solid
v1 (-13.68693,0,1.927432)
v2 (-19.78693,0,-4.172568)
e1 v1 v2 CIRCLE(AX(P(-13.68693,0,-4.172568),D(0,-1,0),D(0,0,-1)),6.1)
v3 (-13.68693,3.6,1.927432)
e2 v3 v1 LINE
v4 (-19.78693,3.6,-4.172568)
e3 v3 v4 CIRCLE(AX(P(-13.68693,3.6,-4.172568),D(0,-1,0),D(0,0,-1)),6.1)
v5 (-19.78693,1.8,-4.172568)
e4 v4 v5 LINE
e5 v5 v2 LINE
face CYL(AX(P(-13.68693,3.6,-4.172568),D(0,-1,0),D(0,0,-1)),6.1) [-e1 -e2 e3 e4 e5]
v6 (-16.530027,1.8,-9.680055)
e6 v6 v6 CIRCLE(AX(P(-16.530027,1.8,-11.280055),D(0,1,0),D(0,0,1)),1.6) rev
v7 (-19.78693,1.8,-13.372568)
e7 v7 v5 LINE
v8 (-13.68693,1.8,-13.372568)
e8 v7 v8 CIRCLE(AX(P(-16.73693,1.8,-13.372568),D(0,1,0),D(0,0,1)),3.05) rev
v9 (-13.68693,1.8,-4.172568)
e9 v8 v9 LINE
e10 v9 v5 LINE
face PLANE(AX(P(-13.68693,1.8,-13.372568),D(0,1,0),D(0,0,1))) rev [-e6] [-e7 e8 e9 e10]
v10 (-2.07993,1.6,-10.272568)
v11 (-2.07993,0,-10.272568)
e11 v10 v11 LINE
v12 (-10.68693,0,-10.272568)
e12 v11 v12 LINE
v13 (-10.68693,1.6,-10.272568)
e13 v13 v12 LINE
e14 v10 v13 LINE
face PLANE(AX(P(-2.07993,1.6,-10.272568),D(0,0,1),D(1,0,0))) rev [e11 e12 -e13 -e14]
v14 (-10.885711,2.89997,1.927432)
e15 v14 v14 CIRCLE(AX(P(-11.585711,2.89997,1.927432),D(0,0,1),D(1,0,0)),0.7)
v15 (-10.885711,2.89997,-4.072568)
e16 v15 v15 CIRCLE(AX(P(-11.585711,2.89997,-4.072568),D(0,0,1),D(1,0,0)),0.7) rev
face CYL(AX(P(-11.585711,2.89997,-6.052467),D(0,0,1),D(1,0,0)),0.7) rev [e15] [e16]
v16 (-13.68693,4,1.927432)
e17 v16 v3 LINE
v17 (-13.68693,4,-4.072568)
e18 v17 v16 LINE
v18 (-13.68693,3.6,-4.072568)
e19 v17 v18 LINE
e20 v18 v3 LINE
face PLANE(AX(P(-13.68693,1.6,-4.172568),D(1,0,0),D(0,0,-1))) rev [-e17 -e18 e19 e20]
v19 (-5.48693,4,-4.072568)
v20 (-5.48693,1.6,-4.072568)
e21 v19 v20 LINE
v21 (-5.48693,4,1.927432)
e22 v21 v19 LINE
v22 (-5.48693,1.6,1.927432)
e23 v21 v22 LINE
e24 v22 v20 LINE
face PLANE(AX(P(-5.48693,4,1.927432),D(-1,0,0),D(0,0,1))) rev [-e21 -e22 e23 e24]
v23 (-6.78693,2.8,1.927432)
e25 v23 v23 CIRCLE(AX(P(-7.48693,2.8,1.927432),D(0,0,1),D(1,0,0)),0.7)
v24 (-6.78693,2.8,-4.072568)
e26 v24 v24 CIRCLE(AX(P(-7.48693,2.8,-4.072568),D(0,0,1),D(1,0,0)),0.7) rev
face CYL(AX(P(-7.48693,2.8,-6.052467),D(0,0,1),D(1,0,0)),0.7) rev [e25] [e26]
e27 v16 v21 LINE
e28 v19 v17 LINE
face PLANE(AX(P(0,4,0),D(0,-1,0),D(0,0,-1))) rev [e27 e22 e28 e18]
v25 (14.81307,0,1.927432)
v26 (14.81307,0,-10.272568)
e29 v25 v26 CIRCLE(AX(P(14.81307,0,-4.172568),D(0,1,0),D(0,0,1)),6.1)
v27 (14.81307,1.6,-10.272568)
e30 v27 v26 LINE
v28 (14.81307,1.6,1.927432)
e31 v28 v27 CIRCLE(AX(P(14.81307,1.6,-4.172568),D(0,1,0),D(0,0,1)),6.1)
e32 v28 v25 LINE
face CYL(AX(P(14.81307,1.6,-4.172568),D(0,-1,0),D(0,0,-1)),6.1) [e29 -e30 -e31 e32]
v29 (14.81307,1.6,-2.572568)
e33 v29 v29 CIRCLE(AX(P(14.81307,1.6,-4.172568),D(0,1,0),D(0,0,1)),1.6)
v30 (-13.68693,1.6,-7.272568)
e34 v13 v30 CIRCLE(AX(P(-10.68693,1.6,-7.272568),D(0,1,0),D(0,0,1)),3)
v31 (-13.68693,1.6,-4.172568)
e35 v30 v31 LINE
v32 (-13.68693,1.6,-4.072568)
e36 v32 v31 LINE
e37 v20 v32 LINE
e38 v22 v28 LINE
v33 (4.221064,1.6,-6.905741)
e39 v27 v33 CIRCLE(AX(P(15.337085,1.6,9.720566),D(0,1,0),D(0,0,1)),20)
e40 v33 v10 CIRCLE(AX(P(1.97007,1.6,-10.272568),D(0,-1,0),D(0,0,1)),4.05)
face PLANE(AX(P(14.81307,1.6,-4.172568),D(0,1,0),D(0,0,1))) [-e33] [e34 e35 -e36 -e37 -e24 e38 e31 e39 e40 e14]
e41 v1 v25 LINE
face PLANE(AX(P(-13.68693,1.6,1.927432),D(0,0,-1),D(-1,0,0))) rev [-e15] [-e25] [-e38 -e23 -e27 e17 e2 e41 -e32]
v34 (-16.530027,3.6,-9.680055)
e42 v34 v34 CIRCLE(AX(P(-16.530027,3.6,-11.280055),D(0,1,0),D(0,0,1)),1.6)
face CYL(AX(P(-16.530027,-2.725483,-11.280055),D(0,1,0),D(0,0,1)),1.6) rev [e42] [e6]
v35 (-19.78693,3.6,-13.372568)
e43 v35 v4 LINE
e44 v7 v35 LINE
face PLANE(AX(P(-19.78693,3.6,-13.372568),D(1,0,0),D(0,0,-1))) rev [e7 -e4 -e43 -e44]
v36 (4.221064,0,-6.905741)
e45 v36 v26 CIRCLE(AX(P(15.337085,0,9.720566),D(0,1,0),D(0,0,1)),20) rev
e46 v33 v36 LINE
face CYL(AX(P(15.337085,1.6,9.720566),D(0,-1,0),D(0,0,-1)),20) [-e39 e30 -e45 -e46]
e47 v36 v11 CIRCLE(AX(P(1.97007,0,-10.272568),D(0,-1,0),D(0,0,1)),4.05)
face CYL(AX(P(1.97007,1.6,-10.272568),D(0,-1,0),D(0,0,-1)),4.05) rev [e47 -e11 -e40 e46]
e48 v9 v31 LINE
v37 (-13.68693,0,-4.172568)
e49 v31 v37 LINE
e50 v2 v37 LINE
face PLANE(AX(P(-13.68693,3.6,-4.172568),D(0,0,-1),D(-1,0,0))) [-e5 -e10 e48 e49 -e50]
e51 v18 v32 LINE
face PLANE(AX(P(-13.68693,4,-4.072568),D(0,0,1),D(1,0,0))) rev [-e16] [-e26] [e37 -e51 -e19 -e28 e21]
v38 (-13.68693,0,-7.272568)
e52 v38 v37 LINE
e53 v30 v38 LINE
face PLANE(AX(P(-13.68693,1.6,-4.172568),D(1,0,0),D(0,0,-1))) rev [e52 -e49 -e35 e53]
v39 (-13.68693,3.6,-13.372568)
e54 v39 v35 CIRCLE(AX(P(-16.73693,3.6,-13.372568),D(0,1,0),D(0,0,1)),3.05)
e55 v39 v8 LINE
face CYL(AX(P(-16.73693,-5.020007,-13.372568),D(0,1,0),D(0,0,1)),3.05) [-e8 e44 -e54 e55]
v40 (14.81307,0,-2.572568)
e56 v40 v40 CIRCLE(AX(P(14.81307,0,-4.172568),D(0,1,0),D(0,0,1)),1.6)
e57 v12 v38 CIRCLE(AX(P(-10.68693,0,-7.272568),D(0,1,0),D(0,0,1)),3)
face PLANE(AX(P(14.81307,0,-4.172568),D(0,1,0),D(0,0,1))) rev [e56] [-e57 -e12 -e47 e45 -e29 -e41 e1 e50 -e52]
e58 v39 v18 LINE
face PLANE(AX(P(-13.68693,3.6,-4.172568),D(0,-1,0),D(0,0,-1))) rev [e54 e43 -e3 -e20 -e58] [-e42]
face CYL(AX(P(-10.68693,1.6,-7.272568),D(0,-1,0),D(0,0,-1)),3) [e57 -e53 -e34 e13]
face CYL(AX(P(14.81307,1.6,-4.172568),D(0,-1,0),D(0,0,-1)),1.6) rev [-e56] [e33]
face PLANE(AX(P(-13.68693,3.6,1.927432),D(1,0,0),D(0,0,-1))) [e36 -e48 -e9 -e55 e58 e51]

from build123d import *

# Parameters (mm, degrees)
SKETCH1_R           = 1.6
BOSS_EXTRUDE1_DEPTH = 1.6
SKETCH2_W           = 8.2
SKETCH2_H           = 6
BOSS_EXTRUDE2_DEPTH = 2.4
SKETCH3_R           = 0.7
CUT_EXTRUDE1_DEPTH  = 6
BOSS_EXTRUDE3_DEPTH = 3.6
SKETCH5_W           = 6.1
SKETCH5_H           = 1.8
BOSS_EXTRUDE4_DEPTH = 9.2
BOSS_EXTRUDE5_DEPTH = 1.8
SKETCH7_R           = 1.6
CUT_EXTRUDE2_DEPTH  = 1.8
FILLET1_R           = 20


with BuildPart() as part:
    # Sketch1 → Boss-Extrude1 (new body)
    with BuildSketch(Plane(origin=(0, 0, 0), x_dir=(1, 0, 0), z_dir=(0, 1, 0))):
        with BuildLine():
            Line((-13.686930091, -1.927431611), (14.813069909, -1.927431611))
            ThreePointArc((14.813069909, -1.927431611), (20.913069909, 4.172568389), (14.813069909, 10.272568389))
            Line((14.813069909, 10.272568389), (6.020069909, 10.272568389))
            ThreePointArc((6.020069909, 10.272568389), (1.970069909, 6.222568389), (-2.079930091, 10.272568389))
            Line((-2.079930091, 10.272568389), (-10.686930091, 10.272568389))
            ThreePointArc((-10.686930091, 10.272568389), (-12.808250435, 9.393888733), (-13.686930091, 7.272568389))
            Line((-13.686930091, 7.272568389), (-13.686930091, 4.172568389))
            Line((-13.686930091, 4.172568389), (-13.686930091, -1.927431611))
        make_face()
        with Locations(Location((14.813069909, 4.172568389, 0), (0, 0, 270))):
            Circle(SKETCH1_R, mode=Mode.SUBTRACT)
    extrude(amount=BOSS_EXTRUDE1_DEPTH)

    # Sketch2 → Boss-Extrude2 (add)
    with BuildSketch(Plane(origin=(0, 1.6, 0), x_dir=(1, 0, 0), z_dir=(0, 1, 0))):
        with Locations((-9.586930091, 1.072568389)):
            Rectangle(SKETCH2_W, SKETCH2_H)
    extrude(amount=BOSS_EXTRUDE2_DEPTH)

    # Sketch3 → Cut-Extrude1 (cut)
    with BuildSketch(Plane.XY.offset(1.927431611)):
        with Locations((-11.585711123, 2.899970269)):
            Circle(SKETCH3_R)
        with Locations((-7.486930091, 2.8)):
            Circle(SKETCH3_R)
    extrude(amount=-CUT_EXTRUDE1_DEPTH, mode=Mode.SUBTRACT)



with BuildPart() as body_2:
    # Sketch4 → Boss-Extrude3 (new body)
    with BuildSketch(Plane.XZ):
        with BuildLine():
            Line((-13.686930091, 1.927431611), (-13.686930091, -4.172568389))
            Line((-13.686930091, -4.172568389), (-19.786930091, -4.172568389))
            ThreePointArc((-19.786930091, -4.172568389), (-18.000281456, 0.140782976), (-13.686930091, 1.927431611))
        make_face()
    extrude(amount=-BOSS_EXTRUDE3_DEPTH)


with BuildPart() as part_1:
    add(part.part)

    add(body_2.part)  # Boss-Extrude4 merges body 2
    # Sketch5 → Boss-Extrude4 (add)
    with BuildSketch(Plane(origin=(0, 0, -4.172568389), x_dir=(-1, 0, 0), z_dir=(0, 0, -1))):
        with Locations((16.736930091, 2.7)):
            Rectangle(SKETCH5_W, SKETCH5_H)
    extrude(amount=BOSS_EXTRUDE4_DEPTH)

    # Sketch6 → Boss-Extrude5 (add)
    with BuildSketch(Plane(origin=(0, 3.6, 0), x_dir=(1, 0, 0), z_dir=(0, 1, 0))):
        with BuildLine():
            Line((-19.786930091, 13.372568389), (-13.686930091, 13.372568389))
            ThreePointArc((-13.686930091, 13.372568389), (-16.736930091, 16.422568389), (-19.786930091, 13.372568389))
        make_face()
    extrude(amount=-BOSS_EXTRUDE5_DEPTH)

    # Sketch7 → Cut-Extrude2 (cut)
    with BuildSketch(Plane(origin=(0, 3.6, 0), x_dir=(1, 0, 0), z_dir=(0, 1, 0))):
        with Locations(Location((-16.530026975, 11.280054915, 0), (0, 0, 270))):
            Circle(SKETCH7_R)
    extrude(amount=-CUT_EXTRUDE2_DEPTH, mode=Mode.SUBTRACT)

    # Fillet1
    # the kernel refuses this fillet: 20 mm, written as the material it takes off along each edge
    with BuildSketch(Plane(origin=(6.020069909, -21.9825, -10.272568389), x_dir=(-0.47127431381884255, 0, 0.8819866898851587), z_dir=(0, 1, 0))) as fillet1_piece_1:
        with BuildLine():
            CenterArc((13.242808218, 17.639733798), FILLET1_R, 209.618411235, 32.264541926)
            Line((-4.143915041, 7.755308964), (-4.491649507, 7.557620467))
            ThreePointArc((-4.491649507, 7.557620467), (-2.424752197, 3.689144757), (-0.352794676, -0.188509726))
            Line((-0.352794676, -0.188509726), (0.188509726, -0.352794676))
            ThreePointArc((0.188509726, -0.352794676), (1.908660971, 0.077953906), (3.628812216, -0.352794676))
            Line((3.628812216, -0.352794676), (3.817321942, 0))
        make_face()
    extrude(amount=45.565, mode=Mode.SUBTRACT)


solid = part_1.part
